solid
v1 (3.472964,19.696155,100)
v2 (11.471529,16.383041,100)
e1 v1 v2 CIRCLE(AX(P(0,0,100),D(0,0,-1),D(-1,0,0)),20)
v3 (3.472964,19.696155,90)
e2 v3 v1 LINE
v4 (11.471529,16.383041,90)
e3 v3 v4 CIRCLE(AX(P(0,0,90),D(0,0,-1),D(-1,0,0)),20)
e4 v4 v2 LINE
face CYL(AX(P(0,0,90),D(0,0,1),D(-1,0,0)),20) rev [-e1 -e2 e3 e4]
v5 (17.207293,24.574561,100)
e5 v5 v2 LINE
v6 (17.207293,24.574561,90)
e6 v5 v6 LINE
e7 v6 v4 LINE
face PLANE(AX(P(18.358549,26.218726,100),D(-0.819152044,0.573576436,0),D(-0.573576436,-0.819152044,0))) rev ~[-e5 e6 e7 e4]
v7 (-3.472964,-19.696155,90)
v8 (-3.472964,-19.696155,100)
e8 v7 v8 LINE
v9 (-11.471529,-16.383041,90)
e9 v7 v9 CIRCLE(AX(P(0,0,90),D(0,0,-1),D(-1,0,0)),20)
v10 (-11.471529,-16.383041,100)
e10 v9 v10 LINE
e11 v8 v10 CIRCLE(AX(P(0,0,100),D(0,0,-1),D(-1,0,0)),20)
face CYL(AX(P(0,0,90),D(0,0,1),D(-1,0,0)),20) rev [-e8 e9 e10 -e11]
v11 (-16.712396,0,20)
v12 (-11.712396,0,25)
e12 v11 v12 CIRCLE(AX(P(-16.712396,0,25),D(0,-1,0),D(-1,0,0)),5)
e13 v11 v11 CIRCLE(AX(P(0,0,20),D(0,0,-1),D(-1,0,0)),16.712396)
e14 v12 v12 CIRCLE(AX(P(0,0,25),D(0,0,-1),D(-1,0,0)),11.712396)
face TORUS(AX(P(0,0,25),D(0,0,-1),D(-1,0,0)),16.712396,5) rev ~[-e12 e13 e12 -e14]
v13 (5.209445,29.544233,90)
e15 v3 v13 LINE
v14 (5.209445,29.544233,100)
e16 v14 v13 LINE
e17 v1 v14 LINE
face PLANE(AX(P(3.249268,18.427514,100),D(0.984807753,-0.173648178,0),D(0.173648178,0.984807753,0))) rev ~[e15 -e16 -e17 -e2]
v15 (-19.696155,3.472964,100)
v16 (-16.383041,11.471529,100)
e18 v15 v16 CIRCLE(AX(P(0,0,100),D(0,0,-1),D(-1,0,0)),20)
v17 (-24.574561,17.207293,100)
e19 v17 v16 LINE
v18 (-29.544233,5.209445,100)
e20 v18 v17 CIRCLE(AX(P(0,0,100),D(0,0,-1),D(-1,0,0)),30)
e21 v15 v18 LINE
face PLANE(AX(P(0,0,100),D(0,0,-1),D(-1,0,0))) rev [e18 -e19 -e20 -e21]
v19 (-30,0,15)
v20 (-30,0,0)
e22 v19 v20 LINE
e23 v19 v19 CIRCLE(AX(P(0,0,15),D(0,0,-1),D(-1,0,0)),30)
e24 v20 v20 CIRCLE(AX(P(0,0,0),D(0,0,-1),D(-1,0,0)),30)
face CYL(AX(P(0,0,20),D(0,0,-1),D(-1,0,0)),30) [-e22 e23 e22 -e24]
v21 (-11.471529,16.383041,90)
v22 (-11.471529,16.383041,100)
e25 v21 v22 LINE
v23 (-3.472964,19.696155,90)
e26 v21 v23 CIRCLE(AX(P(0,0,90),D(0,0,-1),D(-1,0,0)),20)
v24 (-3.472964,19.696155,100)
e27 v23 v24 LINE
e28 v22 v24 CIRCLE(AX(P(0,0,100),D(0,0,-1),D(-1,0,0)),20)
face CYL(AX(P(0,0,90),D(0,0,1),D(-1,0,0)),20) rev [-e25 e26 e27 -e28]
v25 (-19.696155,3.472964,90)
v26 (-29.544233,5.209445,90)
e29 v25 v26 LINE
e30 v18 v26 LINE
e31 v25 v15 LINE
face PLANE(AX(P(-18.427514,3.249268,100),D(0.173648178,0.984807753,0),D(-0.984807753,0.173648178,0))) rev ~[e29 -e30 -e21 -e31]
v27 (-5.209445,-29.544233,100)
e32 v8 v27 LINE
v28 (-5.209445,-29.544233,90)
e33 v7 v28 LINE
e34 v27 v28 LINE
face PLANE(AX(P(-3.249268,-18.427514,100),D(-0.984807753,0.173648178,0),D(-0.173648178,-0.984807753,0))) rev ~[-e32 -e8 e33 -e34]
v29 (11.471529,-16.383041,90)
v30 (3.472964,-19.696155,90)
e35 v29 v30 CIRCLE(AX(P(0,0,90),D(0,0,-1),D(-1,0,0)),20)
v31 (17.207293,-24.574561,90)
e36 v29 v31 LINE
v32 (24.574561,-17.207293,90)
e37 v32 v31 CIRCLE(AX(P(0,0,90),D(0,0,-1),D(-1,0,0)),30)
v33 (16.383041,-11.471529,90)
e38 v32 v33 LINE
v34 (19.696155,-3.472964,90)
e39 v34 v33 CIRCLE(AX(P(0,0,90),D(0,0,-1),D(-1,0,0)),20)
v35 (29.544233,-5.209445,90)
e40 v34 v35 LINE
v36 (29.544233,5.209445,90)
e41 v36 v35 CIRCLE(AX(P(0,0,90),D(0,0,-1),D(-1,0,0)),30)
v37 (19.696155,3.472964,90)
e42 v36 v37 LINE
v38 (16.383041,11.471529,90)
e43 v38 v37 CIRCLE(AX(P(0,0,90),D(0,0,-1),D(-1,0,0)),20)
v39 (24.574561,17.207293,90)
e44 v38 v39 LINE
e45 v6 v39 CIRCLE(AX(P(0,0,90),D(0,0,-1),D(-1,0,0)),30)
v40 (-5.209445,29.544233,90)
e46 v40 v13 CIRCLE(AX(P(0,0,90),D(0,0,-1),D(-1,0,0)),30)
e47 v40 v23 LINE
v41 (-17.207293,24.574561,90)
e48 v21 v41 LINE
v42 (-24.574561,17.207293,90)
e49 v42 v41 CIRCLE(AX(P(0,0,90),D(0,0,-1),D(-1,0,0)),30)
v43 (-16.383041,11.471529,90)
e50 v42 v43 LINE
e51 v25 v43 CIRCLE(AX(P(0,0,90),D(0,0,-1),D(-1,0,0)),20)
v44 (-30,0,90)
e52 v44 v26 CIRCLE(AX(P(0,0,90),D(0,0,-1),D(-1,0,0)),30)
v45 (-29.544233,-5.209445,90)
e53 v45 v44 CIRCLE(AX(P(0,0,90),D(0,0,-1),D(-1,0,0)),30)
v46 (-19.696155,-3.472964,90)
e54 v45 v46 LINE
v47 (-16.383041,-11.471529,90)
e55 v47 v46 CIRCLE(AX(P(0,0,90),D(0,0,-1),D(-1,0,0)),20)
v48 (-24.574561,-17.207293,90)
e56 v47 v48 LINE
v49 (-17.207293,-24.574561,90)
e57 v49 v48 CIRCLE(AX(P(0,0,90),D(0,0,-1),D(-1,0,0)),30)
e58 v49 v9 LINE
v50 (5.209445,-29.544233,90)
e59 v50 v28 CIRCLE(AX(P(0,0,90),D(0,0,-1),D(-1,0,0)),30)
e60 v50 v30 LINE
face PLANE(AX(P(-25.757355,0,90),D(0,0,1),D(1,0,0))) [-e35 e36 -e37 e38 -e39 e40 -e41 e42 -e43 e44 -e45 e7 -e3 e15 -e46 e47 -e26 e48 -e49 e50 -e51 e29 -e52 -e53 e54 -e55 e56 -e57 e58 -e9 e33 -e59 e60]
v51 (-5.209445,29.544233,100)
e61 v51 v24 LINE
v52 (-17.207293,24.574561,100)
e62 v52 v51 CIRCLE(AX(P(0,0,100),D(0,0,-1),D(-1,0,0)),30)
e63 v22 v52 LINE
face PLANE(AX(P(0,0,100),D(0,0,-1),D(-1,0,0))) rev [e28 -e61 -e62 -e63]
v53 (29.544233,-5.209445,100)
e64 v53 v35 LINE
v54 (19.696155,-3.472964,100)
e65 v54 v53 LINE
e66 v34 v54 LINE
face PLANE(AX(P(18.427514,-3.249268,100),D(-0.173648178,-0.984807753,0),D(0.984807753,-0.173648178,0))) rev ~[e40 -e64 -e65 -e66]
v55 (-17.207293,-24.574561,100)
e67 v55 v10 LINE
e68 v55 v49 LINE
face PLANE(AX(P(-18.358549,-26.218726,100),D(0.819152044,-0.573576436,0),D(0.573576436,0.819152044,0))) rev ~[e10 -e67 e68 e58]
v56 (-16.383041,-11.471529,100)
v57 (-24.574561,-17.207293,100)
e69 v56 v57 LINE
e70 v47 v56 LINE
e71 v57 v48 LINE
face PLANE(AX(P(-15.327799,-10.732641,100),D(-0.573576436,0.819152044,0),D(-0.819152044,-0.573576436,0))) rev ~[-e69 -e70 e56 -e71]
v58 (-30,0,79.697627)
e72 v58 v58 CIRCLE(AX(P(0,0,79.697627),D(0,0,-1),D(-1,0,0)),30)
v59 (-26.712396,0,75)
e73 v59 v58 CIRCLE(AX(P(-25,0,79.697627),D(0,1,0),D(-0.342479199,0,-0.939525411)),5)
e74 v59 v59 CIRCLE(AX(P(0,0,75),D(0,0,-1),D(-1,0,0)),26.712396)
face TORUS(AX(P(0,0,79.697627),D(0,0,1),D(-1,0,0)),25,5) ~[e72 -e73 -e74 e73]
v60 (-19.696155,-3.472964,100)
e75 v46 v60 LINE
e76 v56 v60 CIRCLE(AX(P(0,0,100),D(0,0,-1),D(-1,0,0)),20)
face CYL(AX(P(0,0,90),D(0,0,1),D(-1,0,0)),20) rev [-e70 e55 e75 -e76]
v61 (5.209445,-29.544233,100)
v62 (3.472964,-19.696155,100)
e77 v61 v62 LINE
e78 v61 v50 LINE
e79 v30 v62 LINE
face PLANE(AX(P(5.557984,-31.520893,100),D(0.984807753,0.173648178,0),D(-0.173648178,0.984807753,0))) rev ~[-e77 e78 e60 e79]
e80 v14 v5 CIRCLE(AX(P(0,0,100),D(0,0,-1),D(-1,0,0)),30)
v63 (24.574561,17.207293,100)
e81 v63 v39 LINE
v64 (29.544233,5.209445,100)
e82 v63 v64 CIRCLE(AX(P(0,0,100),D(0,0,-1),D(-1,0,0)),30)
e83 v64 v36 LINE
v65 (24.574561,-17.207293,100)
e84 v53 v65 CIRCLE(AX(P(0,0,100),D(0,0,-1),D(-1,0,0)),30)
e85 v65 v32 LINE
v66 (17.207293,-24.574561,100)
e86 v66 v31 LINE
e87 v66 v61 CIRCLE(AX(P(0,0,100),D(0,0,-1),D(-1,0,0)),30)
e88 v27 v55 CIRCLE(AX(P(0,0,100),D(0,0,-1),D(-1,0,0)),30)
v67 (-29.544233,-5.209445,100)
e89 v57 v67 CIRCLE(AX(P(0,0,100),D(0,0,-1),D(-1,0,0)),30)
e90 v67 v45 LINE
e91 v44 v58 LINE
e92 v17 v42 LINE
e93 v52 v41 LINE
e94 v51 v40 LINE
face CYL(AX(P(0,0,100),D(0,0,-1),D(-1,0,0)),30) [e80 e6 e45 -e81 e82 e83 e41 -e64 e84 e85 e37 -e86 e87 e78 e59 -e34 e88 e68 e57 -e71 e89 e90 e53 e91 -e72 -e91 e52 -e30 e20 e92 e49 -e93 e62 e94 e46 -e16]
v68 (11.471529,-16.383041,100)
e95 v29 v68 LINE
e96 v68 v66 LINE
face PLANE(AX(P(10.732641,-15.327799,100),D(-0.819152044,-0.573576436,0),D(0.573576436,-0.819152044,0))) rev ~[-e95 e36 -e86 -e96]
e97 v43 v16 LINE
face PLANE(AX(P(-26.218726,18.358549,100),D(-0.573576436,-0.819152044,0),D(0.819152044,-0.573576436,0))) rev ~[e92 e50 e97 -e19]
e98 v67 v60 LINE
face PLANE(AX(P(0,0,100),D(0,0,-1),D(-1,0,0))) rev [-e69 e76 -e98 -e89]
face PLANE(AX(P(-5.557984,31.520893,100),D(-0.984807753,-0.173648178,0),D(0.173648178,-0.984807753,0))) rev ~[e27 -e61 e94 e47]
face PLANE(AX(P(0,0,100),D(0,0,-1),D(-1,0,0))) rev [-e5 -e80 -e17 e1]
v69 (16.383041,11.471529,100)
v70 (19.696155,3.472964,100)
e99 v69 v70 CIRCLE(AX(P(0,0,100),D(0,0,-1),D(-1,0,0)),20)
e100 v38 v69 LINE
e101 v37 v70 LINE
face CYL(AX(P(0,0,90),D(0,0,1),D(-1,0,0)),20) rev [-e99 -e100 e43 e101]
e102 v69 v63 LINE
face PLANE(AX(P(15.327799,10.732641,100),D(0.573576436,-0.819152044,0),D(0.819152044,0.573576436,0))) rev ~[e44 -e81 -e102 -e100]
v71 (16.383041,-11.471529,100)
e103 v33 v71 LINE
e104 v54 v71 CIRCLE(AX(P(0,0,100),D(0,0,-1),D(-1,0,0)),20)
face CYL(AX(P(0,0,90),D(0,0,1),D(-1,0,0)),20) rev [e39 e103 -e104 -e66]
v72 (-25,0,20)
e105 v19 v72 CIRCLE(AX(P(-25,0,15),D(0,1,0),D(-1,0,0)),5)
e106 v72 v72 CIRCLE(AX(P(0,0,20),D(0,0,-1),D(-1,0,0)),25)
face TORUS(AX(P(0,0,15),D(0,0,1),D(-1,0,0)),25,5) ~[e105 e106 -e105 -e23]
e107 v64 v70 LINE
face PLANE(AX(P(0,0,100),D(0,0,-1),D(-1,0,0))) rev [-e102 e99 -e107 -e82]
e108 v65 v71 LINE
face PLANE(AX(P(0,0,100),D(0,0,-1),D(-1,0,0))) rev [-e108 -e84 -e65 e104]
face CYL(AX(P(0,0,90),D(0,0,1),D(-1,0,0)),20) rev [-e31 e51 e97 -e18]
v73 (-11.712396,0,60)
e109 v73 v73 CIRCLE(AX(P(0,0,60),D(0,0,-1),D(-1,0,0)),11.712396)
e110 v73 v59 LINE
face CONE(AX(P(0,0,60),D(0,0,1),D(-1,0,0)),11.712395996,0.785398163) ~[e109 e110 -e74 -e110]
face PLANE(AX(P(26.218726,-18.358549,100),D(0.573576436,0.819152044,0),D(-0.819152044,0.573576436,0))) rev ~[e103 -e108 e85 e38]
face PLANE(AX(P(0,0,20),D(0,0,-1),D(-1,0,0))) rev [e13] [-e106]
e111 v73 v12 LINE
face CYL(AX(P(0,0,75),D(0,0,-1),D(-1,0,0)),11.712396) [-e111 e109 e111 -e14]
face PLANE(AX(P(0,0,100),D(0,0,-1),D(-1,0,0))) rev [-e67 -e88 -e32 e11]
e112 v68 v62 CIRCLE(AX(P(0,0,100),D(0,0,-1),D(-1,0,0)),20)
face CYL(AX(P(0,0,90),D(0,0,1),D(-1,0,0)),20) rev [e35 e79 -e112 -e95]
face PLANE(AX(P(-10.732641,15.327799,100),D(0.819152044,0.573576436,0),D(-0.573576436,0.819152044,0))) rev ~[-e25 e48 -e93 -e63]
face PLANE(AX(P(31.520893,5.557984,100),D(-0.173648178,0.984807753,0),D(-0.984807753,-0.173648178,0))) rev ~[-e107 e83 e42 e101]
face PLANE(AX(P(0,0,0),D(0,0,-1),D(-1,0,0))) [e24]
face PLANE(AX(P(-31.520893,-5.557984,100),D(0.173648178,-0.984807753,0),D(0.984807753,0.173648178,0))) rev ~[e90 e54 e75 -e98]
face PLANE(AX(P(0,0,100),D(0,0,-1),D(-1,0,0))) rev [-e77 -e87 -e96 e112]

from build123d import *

# Parameters (mm, degrees)
F3_DEPTH = 10
F4_R     = 5
F5_SIZE  = 15


# Not quite as in the source:
# - a fillet or chamfer that OpenCascade refuses, or shapes differently, is made with other operations: its cross-section is extruded or revolved along the edge and cut away or added


with BuildPart() as f1:
    # F0 (on Front) → F1 (revolve)
    with BuildSketch(Plane.XZ):
        Polygon((-30, 0), (0, 0), (0, 90), (-20, 90), (-20, 100), (-30, 100), (-30, 75), (-11.7123959959, 75), (-11.7123959959, 20), (-30, 20), align=None)
    revolve(axis=Axis((0, 0, 45), (0, 0, -1)))

    # F2 (on face) → F3 (cut)
    with BuildSketch(Plane.XY.offset(100)):
        with BuildLine():
            ThreePointArc((-3.2492678477, 18.4275136719), (0, 18.7117877734), (3.2492678477, 18.4275136719))
            Line((3.2492678477, 18.4275136719), (5.5579839553, 31.5208933594))
            ThreePointArc((5.5579839553, 31.5208933594), (0, 32.0071539476), (-5.5579839553, 31.5208933594))
            Line((-5.5579839553, 31.5208933594), (-3.2492678477, 18.4275136719))
        make_face()
        with BuildLine():
            ThreePointArc((-15.3277992068, 10.7326405488), (-13.2312320227, 13.2312320227), (-10.7326405488, 15.3277992068))
            Line((-10.7326405488, 15.3277992068), (-18.358549299, 26.218725588))
            ThreePointArc((-18.358549299, 26.218725588), (-22.6324756028, 22.6324756028), (-26.218725588, 18.358549299))
            Line((-26.218725588, 18.358549299), (-15.3277992068, 10.7326405488))
        make_face()
        with BuildLine():
            ThreePointArc((-18.4275136719, -3.2492678477), (-18.7117877734, 0), (-18.4275136719, 3.2492678477))
            Line((-18.4275136719, 3.2492678477), (-31.5208933594, 5.5579839553))
            ThreePointArc((-31.5208933594, 5.5579839553), (-32.0071539476, 0), (-31.5208933594, -5.5579839553))
            Line((-31.5208933594, -5.5579839553), (-18.4275136719, -3.2492678477))
        make_face()
        with BuildLine():
            ThreePointArc((-10.7326405488, -15.3277992068), (-13.2312320227, -13.2312320227), (-15.3277992068, -10.7326405488))
            Line((-15.3277992068, -10.7326405488), (-26.218725588, -18.358549299))
            ThreePointArc((-26.218725588, -18.358549299), (-22.6324756028, -22.6324756028), (-18.358549299, -26.218725588))
            Line((-18.358549299, -26.218725588), (-10.7326405488, -15.3277992068))
        make_face()
        with BuildLine():
            ThreePointArc((3.2492678477, -18.4275136719), (0, -18.7117877734), (-3.2492678477, -18.4275136719))
            Line((-3.2492678477, -18.4275136719), (-5.5579839553, -31.5208933594))
            ThreePointArc((-5.5579839553, -31.5208933594), (0, -32.0071539476), (5.5579839553, -31.5208933594))
            Line((5.5579839553, -31.5208933594), (3.2492678477, -18.4275136719))
        make_face()
        with BuildLine():
            ThreePointArc((15.3277992068, -10.7326405488), (13.2312320227, -13.2312320227), (10.7326405488, -15.3277992068))
            Line((10.7326405488, -15.3277992068), (18.358549299, -26.218725588))
            ThreePointArc((18.358549299, -26.218725588), (22.6324756028, -22.6324756028), (26.218725588, -18.358549299))
            Line((26.218725588, -18.358549299), (15.3277992068, -10.7326405488))
        make_face()
        with BuildLine():
            ThreePointArc((18.4275136719, 3.2492678477), (18.7117877734, 0), (18.4275136719, -3.2492678477))
            Line((18.4275136719, -3.2492678477), (31.5208933594, -5.5579839553))
            ThreePointArc((31.5208933594, -5.5579839553), (32.0071539476, 0), (31.5208933594, 5.5579839553))
            Line((31.5208933594, 5.5579839553), (18.4275136719, 3.2492678477))
        make_face()
        with BuildLine():
            ThreePointArc((10.7326405488, 15.3277992068), (13.2312320227, 13.2312320227), (15.3277992068, 10.7326405488))
            Line((15.3277992068, 10.7326405488), (26.218725588, 18.358549299))
            ThreePointArc((26.218725588, 18.358549299), (22.6324756028, 22.6324756028), (18.358549299, 26.218725588))
            Line((18.358549299, 26.218725588), (10.7326405488, 15.3277992068))
        make_face()
    extrude(amount=-F3_DEPTH, mode=Mode.SUBTRACT)

    # F4
    f4_edges = [f1.edges().sort_by_distance(p)[0] for p in [
        (11.712396, 0, 20),
        (30, 0, 20),
    ]]
    fillet(f4_edges, radius=F4_R)

    # F5
    f5_edges = [f1.edges().sort_by_distance(p)[0] for p in [
        (11.712396, 0, 75),
    ]]
    chamfer(f5_edges, length=F5_SIZE)

    # F6: fillet of radius 5 on 1 edges, made by hand

    # F6_s1 → F6_t2 (revolve, cut)
    with BuildSketch(Plane.XZ):
        with BuildLine():
            ThreePointArc((-26.7123959959, 75), (-29.0964606662, 76.8307454727), (-30, 79.6976270556))
            Line((-30, 79.6976270556), (-30.1, 79.6976270556))
            Line((-30.1, 79.6976270556), (-30.1, 75))
            Line((-30.1, 75), (-30, 74.9))
            ThreePointArc((-30, 74.9), (-28.3561979979, 74.9), (-26.7466439158, 74.9060474589))
            Line((-26.7466439158, 74.9060474589), (-26.7123959959, 75))
        make_face()
    revolve(axis=Axis((0, 0, 75), (0, 0, -1)), mode=Mode.SUBTRACT)


solid = f1.part
